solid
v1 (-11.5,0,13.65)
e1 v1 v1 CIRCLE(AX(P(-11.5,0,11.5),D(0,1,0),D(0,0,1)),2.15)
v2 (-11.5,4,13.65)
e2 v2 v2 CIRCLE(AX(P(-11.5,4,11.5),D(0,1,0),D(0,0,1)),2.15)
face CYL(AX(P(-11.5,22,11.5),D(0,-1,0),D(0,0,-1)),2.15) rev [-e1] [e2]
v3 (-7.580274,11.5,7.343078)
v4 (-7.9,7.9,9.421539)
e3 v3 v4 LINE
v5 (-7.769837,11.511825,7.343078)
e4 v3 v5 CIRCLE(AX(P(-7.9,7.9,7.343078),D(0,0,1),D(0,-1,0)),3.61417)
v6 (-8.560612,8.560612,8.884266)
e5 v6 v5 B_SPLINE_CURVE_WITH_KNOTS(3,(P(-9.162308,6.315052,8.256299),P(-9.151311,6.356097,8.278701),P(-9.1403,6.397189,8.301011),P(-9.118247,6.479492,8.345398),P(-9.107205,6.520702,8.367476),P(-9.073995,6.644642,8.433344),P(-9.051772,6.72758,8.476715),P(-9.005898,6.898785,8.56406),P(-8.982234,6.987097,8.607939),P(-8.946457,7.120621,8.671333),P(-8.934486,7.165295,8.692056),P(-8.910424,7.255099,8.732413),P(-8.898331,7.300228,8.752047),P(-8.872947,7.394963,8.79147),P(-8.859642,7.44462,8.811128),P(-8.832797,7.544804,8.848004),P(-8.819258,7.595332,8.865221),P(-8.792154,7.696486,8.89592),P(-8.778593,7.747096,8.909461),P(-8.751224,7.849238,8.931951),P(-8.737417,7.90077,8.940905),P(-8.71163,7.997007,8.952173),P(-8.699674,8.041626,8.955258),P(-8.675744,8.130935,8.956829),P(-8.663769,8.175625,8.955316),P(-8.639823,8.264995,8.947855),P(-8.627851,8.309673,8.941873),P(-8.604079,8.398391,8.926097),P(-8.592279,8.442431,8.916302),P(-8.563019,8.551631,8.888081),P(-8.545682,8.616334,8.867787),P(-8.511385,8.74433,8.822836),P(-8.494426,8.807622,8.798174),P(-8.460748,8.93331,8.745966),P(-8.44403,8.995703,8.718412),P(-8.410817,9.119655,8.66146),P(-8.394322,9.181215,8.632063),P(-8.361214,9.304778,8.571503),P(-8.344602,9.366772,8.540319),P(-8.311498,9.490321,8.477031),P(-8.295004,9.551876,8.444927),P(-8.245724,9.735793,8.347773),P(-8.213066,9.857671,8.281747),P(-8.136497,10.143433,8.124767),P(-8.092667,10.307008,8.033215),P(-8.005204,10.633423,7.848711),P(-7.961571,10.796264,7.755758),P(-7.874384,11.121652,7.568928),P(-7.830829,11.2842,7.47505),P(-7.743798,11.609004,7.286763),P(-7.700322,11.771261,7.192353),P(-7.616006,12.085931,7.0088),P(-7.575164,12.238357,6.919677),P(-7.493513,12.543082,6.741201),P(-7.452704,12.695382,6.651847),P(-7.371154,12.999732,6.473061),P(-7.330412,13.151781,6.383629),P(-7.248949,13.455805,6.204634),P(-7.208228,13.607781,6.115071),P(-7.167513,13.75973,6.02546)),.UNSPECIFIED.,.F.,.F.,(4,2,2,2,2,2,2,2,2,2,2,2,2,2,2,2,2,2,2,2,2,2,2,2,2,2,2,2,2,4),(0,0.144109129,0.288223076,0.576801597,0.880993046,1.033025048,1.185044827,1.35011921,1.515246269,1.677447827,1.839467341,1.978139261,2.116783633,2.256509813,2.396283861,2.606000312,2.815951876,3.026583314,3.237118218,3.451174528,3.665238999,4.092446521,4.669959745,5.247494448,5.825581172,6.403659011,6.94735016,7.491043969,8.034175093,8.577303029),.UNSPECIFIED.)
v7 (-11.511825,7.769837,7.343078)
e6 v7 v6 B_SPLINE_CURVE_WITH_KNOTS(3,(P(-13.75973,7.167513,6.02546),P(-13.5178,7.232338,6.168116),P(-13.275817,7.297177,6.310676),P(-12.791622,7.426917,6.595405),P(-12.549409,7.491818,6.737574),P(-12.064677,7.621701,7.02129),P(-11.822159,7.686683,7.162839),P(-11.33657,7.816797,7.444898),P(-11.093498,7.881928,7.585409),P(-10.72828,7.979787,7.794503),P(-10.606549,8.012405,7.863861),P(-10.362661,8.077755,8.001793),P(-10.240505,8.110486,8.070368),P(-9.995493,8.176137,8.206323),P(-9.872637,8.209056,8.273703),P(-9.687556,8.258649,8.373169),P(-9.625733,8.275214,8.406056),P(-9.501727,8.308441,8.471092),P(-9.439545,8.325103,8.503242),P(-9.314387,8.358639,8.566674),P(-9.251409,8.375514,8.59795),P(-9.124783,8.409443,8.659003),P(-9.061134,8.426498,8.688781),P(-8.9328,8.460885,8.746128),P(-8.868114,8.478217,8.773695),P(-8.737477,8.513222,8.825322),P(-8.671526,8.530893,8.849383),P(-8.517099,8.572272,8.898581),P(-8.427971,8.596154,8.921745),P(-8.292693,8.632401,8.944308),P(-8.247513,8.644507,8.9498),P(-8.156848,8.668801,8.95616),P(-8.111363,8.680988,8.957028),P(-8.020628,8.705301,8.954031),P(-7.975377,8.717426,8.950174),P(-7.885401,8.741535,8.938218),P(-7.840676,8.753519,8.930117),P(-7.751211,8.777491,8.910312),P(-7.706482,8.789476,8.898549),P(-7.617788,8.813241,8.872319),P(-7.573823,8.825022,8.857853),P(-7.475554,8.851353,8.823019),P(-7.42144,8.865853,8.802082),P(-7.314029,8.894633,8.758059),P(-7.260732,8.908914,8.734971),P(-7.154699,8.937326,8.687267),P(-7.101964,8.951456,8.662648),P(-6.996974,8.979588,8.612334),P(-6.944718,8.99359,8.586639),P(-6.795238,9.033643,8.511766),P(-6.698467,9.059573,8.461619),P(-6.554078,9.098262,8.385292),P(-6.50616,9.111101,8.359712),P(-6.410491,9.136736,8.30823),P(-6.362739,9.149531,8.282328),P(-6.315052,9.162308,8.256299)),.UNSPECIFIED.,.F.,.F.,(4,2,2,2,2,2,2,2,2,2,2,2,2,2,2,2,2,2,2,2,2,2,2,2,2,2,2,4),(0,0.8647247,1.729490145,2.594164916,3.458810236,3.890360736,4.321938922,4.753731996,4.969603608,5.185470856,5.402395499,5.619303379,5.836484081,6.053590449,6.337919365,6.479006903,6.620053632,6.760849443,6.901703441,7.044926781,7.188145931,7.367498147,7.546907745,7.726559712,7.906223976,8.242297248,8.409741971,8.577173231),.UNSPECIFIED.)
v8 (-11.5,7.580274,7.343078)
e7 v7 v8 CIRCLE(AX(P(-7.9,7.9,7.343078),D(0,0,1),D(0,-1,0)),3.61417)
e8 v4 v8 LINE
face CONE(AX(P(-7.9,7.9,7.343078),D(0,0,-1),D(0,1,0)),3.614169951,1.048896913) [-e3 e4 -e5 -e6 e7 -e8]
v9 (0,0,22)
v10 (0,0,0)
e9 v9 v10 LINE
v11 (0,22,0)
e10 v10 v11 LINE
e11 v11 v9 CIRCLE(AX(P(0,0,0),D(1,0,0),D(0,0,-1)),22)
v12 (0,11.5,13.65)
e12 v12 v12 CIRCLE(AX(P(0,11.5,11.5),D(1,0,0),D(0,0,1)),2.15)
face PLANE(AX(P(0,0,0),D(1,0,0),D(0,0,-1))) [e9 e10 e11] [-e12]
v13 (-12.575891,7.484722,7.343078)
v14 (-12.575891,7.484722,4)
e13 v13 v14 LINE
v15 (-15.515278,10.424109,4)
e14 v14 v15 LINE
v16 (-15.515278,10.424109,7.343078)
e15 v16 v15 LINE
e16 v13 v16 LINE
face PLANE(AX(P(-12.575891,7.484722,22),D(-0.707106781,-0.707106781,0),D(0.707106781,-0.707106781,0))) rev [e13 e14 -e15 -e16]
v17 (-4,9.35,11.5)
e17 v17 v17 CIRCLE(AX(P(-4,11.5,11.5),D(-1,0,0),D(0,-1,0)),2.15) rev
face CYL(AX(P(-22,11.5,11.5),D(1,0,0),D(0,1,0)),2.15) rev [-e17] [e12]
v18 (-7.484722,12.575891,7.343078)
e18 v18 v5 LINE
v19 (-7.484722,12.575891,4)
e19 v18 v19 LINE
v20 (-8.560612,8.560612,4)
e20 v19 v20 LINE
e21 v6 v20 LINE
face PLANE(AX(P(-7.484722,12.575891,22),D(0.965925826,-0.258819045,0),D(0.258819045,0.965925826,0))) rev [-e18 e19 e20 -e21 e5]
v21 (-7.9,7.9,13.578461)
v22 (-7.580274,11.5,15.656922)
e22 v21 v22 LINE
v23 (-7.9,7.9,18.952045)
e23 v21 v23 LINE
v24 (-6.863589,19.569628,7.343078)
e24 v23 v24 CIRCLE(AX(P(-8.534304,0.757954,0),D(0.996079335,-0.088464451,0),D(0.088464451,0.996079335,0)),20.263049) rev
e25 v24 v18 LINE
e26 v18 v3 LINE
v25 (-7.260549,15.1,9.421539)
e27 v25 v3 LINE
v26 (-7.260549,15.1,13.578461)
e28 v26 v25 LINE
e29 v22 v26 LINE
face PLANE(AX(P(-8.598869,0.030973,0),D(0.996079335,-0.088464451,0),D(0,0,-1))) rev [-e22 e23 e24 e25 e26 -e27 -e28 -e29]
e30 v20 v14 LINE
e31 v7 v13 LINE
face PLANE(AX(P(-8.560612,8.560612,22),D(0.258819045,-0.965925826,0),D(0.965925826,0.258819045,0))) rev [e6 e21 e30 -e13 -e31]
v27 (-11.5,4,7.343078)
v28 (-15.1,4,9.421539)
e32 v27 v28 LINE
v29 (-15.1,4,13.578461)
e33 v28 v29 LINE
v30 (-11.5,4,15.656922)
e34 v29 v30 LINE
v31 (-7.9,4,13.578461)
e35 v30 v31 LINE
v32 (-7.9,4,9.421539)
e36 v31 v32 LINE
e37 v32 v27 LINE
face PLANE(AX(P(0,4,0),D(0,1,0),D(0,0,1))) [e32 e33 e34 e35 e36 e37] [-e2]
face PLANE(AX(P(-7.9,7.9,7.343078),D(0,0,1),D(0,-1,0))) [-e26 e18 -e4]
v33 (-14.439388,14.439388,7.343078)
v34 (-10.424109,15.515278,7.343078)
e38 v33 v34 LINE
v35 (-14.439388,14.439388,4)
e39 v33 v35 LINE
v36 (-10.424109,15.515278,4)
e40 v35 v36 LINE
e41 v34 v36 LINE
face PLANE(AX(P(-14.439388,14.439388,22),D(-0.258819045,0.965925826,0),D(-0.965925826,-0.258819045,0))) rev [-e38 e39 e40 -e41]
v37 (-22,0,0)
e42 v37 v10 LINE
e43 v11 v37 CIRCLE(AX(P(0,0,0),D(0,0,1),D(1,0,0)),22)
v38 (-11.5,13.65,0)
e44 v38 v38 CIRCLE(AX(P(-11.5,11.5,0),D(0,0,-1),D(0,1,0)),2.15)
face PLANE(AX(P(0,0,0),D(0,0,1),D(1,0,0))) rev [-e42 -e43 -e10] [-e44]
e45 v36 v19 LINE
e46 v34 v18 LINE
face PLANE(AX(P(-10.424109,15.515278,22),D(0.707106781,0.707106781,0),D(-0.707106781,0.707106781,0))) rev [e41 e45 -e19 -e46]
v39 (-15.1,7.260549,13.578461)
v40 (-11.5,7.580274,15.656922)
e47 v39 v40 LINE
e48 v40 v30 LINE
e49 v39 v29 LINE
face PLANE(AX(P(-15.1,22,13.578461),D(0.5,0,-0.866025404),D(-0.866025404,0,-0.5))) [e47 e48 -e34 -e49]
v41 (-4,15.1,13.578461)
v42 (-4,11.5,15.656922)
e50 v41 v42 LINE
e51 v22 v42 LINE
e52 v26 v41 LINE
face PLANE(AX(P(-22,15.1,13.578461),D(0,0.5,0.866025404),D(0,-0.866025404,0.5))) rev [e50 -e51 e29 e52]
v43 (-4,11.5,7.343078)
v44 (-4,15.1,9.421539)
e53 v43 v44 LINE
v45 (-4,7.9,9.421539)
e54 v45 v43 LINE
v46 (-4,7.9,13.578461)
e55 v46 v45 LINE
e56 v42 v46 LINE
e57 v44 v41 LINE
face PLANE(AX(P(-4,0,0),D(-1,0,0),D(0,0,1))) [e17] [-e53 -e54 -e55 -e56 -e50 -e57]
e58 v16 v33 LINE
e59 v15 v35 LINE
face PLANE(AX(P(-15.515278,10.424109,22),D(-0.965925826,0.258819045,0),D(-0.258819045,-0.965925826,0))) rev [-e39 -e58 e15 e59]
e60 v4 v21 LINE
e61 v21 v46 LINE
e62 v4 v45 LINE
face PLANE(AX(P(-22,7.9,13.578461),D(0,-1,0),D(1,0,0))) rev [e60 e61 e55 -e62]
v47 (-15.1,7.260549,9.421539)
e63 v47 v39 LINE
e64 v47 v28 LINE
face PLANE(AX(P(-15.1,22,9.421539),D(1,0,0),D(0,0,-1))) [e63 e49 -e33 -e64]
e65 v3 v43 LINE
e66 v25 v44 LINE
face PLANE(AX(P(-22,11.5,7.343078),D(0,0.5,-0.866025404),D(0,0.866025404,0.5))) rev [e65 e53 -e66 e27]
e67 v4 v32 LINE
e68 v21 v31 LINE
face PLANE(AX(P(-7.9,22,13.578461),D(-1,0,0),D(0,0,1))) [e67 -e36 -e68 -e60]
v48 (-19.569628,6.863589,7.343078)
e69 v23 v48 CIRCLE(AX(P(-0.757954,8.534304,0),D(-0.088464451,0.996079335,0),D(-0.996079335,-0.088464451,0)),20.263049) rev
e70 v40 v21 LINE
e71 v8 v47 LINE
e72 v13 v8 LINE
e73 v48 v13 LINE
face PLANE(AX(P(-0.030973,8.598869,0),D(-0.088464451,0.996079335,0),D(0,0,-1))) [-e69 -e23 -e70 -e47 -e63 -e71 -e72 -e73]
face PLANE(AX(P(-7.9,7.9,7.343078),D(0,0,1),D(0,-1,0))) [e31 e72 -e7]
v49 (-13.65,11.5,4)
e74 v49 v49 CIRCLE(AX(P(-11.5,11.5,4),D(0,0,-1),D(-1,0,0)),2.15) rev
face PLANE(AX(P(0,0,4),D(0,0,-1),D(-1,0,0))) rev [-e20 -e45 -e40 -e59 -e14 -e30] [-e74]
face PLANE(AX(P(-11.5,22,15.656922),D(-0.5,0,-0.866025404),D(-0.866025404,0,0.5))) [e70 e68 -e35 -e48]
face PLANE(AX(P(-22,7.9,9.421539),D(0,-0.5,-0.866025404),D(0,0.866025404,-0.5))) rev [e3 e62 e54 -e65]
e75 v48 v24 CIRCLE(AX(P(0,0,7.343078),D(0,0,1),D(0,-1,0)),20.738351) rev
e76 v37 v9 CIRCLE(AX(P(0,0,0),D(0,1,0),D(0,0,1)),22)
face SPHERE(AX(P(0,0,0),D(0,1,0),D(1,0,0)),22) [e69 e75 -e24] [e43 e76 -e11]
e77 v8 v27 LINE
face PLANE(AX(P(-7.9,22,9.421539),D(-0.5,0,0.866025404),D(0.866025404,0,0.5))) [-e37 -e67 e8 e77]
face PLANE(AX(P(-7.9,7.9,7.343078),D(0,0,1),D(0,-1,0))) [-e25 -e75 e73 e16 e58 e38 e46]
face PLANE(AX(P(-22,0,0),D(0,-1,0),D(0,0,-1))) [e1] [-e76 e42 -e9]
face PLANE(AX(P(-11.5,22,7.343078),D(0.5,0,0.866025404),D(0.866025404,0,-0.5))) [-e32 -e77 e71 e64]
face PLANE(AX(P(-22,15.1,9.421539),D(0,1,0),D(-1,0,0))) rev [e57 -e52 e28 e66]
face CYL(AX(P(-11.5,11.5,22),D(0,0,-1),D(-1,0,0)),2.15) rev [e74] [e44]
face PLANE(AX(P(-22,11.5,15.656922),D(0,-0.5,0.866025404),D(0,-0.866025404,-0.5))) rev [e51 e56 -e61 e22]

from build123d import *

# Parameters (mm, degrees)
REVOLVE1_ANGLE     = 90
SKETCH2_R          = 2.15
EXTRUDE1_DEPTH     = 39.105117767
EXTRUDE2_START     = 4
EXTRUDE2_DEPTH     = 35.105117767
EXTRUDE4_START     = -4
EXTRUDE4_DEPTH     = 35.105117767
CUT_REVOLVE1_START = 7.343078062
CUT_REVOLVE1_DEPTH = 11.608966683
EXTRUDE5_DEPTH     = 36.944401511


# Read off the part's stored shape, not the designer's step: Cut-Revolve1
with BuildPart() as part:
    # Sketch1 → Revolve1 (revolve)
    with BuildSketch(Plane(origin=(0, 0, 0), x_dir=(0, 0, -1), z_dir=(1, 0, 0))):
        with BuildLine():
            Line((0, 0), (0, 22))
            ThreePointArc((0, 22), (-15.556349186, 15.556349186), (-22, 0))
            Line((-22, 0), (0, 0))
        make_face()
    revolve(axis=Axis((0, 0, 0), (0, -1, 0)), revolution_arc=REVOLVE1_ANGLE)

    # Sketch2 → Extrude1 (cut, through all)
    with BuildSketch(Plane(origin=(0, 0, 0), x_dir=(1, 0, 0), z_dir=(0, 1, 0))):
        with Locations(Location((-11.5, -11.5, 0), (0, 0, 225))):
            Circle(SKETCH2_R)
    extrude1 = extrude(amount=EXTRUDE1_DEPTH, mode=Mode.SUBTRACT)

    # Sketch4 → Extrude2 (cut, through all)
    with BuildSketch(Plane(origin=(0, 0, 0), x_dir=(1, 0, 0), z_dir=(0, 1, 0)).offset(EXTRUDE2_START)):
        Polygon((-7.9, -9.421539031), (-11.5, -7.343078062), (-15.1, -9.421539031), (-15.1, -13.578460969), (-11.5, -15.656921938), (-7.9, -13.578460969), align=None)
    extrude2 = extrude(amount=EXTRUDE2_DEPTH, mode=Mode.SUBTRACT)

    # Mirror1: Extrude1 across plane
    add(extrude1.mirror(Plane(origin=(0, 0, 0), x_dir=(2.468850131082266e-15, 0.7071067811865478, 0.7071067811865472), z_dir=(2.4688501310822653e-15, 0.7071067811865475, -0.7071067811865477))), mode=Mode.SUBTRACT)

    # Mirror5: Extrude1, Extrude2 across plane
    add(extrude1.mirror(Plane(origin=(0, 0, 0), x_dir=(0, 0, 1), z_dir=(-0.7071067811865475, -0.7071067811865477, 0))), mode=Mode.SUBTRACT)
    add(extrude2.mirror(Plane(origin=(0, 0, 0), x_dir=(0, 0, 1), z_dir=(-0.7071067811865475, -0.7071067811865477, 0))), mode=Mode.SUBTRACT)

    # Sketch9 → Extrude4 (cut, through all)
    with BuildSketch(Plane(origin=(0, 0, 0), x_dir=(-1, 0, 0), z_dir=(0, 0, -1)).offset(EXTRUDE4_START)):
        Polygon((8.560612309, 8.560612309), (12.575890567, 7.484721742), (15.515278258, 10.424109433), (14.439387691, 14.439387691), (10.424109433, 15.515278258), (7.484721742, 12.575890567), align=None)
    extrude(amount=-EXTRUDE4_DEPTH, mode=Mode.SUBTRACT)

    # Cut-Revolve1 outline → Cut-Revolve1 (cut)
    with BuildSketch(Plane.XY.offset(CUT_REVOLVE1_START)):
        Polygon((-11.5, 7.58027444), (-7.9, 7.9), (-7.484721742, 12.575890567), (-8.560612309, 8.560612309), (-12.575890567, 7.484721742), align=None)
        Polygon((-7.484721742, 12.575890567), (-6.863589335, 19.569628152), (-6.736554213, 21), (-21, 21), (-21, 6.736554212), (-19.569628152, 6.863589334), (-12.575890567, 7.484721742), (-15.515278258, 10.424109433), (-14.439387691, 14.439387691), (-10.424109433, 15.515278258), align=None)
    extrude(amount=CUT_REVOLVE1_DEPTH, mode=Mode.SUBTRACT)

    # Sketch11 → Revolve4 (revolve)
    with BuildSketch(Plane(origin=(-0.757954206, 8.534304053, 0), x_dir=(0.9960793346659582, 0.08846445077782496, 0), z_dir=(-0.08846445077782496, 0.9960793346659582, 0))):
        Polygon((-7.170157583, -9.421539031), (-7.170157583, -7.343078062), (-10.784327534, -7.343078062), align=None)
    revolve(axis=Axis((-7.9, 7.9, 9.421539031), (0, 0, -1)))

    # Sketch12 → Extrude5 (cut, through all)
    with BuildSketch(Plane.XY.offset(4)):
        Polygon((-8.560612309, 8.560612309), (-7.484721742, 12.575890567), (-10.424109433, 15.515278258), (-14.439387691, 14.439387691), (-15.515278258, 10.424109433), (-12.575890567, 7.484721742), align=None)
    extrude(amount=EXTRUDE5_DEPTH, mode=Mode.SUBTRACT)


solid = part.part
